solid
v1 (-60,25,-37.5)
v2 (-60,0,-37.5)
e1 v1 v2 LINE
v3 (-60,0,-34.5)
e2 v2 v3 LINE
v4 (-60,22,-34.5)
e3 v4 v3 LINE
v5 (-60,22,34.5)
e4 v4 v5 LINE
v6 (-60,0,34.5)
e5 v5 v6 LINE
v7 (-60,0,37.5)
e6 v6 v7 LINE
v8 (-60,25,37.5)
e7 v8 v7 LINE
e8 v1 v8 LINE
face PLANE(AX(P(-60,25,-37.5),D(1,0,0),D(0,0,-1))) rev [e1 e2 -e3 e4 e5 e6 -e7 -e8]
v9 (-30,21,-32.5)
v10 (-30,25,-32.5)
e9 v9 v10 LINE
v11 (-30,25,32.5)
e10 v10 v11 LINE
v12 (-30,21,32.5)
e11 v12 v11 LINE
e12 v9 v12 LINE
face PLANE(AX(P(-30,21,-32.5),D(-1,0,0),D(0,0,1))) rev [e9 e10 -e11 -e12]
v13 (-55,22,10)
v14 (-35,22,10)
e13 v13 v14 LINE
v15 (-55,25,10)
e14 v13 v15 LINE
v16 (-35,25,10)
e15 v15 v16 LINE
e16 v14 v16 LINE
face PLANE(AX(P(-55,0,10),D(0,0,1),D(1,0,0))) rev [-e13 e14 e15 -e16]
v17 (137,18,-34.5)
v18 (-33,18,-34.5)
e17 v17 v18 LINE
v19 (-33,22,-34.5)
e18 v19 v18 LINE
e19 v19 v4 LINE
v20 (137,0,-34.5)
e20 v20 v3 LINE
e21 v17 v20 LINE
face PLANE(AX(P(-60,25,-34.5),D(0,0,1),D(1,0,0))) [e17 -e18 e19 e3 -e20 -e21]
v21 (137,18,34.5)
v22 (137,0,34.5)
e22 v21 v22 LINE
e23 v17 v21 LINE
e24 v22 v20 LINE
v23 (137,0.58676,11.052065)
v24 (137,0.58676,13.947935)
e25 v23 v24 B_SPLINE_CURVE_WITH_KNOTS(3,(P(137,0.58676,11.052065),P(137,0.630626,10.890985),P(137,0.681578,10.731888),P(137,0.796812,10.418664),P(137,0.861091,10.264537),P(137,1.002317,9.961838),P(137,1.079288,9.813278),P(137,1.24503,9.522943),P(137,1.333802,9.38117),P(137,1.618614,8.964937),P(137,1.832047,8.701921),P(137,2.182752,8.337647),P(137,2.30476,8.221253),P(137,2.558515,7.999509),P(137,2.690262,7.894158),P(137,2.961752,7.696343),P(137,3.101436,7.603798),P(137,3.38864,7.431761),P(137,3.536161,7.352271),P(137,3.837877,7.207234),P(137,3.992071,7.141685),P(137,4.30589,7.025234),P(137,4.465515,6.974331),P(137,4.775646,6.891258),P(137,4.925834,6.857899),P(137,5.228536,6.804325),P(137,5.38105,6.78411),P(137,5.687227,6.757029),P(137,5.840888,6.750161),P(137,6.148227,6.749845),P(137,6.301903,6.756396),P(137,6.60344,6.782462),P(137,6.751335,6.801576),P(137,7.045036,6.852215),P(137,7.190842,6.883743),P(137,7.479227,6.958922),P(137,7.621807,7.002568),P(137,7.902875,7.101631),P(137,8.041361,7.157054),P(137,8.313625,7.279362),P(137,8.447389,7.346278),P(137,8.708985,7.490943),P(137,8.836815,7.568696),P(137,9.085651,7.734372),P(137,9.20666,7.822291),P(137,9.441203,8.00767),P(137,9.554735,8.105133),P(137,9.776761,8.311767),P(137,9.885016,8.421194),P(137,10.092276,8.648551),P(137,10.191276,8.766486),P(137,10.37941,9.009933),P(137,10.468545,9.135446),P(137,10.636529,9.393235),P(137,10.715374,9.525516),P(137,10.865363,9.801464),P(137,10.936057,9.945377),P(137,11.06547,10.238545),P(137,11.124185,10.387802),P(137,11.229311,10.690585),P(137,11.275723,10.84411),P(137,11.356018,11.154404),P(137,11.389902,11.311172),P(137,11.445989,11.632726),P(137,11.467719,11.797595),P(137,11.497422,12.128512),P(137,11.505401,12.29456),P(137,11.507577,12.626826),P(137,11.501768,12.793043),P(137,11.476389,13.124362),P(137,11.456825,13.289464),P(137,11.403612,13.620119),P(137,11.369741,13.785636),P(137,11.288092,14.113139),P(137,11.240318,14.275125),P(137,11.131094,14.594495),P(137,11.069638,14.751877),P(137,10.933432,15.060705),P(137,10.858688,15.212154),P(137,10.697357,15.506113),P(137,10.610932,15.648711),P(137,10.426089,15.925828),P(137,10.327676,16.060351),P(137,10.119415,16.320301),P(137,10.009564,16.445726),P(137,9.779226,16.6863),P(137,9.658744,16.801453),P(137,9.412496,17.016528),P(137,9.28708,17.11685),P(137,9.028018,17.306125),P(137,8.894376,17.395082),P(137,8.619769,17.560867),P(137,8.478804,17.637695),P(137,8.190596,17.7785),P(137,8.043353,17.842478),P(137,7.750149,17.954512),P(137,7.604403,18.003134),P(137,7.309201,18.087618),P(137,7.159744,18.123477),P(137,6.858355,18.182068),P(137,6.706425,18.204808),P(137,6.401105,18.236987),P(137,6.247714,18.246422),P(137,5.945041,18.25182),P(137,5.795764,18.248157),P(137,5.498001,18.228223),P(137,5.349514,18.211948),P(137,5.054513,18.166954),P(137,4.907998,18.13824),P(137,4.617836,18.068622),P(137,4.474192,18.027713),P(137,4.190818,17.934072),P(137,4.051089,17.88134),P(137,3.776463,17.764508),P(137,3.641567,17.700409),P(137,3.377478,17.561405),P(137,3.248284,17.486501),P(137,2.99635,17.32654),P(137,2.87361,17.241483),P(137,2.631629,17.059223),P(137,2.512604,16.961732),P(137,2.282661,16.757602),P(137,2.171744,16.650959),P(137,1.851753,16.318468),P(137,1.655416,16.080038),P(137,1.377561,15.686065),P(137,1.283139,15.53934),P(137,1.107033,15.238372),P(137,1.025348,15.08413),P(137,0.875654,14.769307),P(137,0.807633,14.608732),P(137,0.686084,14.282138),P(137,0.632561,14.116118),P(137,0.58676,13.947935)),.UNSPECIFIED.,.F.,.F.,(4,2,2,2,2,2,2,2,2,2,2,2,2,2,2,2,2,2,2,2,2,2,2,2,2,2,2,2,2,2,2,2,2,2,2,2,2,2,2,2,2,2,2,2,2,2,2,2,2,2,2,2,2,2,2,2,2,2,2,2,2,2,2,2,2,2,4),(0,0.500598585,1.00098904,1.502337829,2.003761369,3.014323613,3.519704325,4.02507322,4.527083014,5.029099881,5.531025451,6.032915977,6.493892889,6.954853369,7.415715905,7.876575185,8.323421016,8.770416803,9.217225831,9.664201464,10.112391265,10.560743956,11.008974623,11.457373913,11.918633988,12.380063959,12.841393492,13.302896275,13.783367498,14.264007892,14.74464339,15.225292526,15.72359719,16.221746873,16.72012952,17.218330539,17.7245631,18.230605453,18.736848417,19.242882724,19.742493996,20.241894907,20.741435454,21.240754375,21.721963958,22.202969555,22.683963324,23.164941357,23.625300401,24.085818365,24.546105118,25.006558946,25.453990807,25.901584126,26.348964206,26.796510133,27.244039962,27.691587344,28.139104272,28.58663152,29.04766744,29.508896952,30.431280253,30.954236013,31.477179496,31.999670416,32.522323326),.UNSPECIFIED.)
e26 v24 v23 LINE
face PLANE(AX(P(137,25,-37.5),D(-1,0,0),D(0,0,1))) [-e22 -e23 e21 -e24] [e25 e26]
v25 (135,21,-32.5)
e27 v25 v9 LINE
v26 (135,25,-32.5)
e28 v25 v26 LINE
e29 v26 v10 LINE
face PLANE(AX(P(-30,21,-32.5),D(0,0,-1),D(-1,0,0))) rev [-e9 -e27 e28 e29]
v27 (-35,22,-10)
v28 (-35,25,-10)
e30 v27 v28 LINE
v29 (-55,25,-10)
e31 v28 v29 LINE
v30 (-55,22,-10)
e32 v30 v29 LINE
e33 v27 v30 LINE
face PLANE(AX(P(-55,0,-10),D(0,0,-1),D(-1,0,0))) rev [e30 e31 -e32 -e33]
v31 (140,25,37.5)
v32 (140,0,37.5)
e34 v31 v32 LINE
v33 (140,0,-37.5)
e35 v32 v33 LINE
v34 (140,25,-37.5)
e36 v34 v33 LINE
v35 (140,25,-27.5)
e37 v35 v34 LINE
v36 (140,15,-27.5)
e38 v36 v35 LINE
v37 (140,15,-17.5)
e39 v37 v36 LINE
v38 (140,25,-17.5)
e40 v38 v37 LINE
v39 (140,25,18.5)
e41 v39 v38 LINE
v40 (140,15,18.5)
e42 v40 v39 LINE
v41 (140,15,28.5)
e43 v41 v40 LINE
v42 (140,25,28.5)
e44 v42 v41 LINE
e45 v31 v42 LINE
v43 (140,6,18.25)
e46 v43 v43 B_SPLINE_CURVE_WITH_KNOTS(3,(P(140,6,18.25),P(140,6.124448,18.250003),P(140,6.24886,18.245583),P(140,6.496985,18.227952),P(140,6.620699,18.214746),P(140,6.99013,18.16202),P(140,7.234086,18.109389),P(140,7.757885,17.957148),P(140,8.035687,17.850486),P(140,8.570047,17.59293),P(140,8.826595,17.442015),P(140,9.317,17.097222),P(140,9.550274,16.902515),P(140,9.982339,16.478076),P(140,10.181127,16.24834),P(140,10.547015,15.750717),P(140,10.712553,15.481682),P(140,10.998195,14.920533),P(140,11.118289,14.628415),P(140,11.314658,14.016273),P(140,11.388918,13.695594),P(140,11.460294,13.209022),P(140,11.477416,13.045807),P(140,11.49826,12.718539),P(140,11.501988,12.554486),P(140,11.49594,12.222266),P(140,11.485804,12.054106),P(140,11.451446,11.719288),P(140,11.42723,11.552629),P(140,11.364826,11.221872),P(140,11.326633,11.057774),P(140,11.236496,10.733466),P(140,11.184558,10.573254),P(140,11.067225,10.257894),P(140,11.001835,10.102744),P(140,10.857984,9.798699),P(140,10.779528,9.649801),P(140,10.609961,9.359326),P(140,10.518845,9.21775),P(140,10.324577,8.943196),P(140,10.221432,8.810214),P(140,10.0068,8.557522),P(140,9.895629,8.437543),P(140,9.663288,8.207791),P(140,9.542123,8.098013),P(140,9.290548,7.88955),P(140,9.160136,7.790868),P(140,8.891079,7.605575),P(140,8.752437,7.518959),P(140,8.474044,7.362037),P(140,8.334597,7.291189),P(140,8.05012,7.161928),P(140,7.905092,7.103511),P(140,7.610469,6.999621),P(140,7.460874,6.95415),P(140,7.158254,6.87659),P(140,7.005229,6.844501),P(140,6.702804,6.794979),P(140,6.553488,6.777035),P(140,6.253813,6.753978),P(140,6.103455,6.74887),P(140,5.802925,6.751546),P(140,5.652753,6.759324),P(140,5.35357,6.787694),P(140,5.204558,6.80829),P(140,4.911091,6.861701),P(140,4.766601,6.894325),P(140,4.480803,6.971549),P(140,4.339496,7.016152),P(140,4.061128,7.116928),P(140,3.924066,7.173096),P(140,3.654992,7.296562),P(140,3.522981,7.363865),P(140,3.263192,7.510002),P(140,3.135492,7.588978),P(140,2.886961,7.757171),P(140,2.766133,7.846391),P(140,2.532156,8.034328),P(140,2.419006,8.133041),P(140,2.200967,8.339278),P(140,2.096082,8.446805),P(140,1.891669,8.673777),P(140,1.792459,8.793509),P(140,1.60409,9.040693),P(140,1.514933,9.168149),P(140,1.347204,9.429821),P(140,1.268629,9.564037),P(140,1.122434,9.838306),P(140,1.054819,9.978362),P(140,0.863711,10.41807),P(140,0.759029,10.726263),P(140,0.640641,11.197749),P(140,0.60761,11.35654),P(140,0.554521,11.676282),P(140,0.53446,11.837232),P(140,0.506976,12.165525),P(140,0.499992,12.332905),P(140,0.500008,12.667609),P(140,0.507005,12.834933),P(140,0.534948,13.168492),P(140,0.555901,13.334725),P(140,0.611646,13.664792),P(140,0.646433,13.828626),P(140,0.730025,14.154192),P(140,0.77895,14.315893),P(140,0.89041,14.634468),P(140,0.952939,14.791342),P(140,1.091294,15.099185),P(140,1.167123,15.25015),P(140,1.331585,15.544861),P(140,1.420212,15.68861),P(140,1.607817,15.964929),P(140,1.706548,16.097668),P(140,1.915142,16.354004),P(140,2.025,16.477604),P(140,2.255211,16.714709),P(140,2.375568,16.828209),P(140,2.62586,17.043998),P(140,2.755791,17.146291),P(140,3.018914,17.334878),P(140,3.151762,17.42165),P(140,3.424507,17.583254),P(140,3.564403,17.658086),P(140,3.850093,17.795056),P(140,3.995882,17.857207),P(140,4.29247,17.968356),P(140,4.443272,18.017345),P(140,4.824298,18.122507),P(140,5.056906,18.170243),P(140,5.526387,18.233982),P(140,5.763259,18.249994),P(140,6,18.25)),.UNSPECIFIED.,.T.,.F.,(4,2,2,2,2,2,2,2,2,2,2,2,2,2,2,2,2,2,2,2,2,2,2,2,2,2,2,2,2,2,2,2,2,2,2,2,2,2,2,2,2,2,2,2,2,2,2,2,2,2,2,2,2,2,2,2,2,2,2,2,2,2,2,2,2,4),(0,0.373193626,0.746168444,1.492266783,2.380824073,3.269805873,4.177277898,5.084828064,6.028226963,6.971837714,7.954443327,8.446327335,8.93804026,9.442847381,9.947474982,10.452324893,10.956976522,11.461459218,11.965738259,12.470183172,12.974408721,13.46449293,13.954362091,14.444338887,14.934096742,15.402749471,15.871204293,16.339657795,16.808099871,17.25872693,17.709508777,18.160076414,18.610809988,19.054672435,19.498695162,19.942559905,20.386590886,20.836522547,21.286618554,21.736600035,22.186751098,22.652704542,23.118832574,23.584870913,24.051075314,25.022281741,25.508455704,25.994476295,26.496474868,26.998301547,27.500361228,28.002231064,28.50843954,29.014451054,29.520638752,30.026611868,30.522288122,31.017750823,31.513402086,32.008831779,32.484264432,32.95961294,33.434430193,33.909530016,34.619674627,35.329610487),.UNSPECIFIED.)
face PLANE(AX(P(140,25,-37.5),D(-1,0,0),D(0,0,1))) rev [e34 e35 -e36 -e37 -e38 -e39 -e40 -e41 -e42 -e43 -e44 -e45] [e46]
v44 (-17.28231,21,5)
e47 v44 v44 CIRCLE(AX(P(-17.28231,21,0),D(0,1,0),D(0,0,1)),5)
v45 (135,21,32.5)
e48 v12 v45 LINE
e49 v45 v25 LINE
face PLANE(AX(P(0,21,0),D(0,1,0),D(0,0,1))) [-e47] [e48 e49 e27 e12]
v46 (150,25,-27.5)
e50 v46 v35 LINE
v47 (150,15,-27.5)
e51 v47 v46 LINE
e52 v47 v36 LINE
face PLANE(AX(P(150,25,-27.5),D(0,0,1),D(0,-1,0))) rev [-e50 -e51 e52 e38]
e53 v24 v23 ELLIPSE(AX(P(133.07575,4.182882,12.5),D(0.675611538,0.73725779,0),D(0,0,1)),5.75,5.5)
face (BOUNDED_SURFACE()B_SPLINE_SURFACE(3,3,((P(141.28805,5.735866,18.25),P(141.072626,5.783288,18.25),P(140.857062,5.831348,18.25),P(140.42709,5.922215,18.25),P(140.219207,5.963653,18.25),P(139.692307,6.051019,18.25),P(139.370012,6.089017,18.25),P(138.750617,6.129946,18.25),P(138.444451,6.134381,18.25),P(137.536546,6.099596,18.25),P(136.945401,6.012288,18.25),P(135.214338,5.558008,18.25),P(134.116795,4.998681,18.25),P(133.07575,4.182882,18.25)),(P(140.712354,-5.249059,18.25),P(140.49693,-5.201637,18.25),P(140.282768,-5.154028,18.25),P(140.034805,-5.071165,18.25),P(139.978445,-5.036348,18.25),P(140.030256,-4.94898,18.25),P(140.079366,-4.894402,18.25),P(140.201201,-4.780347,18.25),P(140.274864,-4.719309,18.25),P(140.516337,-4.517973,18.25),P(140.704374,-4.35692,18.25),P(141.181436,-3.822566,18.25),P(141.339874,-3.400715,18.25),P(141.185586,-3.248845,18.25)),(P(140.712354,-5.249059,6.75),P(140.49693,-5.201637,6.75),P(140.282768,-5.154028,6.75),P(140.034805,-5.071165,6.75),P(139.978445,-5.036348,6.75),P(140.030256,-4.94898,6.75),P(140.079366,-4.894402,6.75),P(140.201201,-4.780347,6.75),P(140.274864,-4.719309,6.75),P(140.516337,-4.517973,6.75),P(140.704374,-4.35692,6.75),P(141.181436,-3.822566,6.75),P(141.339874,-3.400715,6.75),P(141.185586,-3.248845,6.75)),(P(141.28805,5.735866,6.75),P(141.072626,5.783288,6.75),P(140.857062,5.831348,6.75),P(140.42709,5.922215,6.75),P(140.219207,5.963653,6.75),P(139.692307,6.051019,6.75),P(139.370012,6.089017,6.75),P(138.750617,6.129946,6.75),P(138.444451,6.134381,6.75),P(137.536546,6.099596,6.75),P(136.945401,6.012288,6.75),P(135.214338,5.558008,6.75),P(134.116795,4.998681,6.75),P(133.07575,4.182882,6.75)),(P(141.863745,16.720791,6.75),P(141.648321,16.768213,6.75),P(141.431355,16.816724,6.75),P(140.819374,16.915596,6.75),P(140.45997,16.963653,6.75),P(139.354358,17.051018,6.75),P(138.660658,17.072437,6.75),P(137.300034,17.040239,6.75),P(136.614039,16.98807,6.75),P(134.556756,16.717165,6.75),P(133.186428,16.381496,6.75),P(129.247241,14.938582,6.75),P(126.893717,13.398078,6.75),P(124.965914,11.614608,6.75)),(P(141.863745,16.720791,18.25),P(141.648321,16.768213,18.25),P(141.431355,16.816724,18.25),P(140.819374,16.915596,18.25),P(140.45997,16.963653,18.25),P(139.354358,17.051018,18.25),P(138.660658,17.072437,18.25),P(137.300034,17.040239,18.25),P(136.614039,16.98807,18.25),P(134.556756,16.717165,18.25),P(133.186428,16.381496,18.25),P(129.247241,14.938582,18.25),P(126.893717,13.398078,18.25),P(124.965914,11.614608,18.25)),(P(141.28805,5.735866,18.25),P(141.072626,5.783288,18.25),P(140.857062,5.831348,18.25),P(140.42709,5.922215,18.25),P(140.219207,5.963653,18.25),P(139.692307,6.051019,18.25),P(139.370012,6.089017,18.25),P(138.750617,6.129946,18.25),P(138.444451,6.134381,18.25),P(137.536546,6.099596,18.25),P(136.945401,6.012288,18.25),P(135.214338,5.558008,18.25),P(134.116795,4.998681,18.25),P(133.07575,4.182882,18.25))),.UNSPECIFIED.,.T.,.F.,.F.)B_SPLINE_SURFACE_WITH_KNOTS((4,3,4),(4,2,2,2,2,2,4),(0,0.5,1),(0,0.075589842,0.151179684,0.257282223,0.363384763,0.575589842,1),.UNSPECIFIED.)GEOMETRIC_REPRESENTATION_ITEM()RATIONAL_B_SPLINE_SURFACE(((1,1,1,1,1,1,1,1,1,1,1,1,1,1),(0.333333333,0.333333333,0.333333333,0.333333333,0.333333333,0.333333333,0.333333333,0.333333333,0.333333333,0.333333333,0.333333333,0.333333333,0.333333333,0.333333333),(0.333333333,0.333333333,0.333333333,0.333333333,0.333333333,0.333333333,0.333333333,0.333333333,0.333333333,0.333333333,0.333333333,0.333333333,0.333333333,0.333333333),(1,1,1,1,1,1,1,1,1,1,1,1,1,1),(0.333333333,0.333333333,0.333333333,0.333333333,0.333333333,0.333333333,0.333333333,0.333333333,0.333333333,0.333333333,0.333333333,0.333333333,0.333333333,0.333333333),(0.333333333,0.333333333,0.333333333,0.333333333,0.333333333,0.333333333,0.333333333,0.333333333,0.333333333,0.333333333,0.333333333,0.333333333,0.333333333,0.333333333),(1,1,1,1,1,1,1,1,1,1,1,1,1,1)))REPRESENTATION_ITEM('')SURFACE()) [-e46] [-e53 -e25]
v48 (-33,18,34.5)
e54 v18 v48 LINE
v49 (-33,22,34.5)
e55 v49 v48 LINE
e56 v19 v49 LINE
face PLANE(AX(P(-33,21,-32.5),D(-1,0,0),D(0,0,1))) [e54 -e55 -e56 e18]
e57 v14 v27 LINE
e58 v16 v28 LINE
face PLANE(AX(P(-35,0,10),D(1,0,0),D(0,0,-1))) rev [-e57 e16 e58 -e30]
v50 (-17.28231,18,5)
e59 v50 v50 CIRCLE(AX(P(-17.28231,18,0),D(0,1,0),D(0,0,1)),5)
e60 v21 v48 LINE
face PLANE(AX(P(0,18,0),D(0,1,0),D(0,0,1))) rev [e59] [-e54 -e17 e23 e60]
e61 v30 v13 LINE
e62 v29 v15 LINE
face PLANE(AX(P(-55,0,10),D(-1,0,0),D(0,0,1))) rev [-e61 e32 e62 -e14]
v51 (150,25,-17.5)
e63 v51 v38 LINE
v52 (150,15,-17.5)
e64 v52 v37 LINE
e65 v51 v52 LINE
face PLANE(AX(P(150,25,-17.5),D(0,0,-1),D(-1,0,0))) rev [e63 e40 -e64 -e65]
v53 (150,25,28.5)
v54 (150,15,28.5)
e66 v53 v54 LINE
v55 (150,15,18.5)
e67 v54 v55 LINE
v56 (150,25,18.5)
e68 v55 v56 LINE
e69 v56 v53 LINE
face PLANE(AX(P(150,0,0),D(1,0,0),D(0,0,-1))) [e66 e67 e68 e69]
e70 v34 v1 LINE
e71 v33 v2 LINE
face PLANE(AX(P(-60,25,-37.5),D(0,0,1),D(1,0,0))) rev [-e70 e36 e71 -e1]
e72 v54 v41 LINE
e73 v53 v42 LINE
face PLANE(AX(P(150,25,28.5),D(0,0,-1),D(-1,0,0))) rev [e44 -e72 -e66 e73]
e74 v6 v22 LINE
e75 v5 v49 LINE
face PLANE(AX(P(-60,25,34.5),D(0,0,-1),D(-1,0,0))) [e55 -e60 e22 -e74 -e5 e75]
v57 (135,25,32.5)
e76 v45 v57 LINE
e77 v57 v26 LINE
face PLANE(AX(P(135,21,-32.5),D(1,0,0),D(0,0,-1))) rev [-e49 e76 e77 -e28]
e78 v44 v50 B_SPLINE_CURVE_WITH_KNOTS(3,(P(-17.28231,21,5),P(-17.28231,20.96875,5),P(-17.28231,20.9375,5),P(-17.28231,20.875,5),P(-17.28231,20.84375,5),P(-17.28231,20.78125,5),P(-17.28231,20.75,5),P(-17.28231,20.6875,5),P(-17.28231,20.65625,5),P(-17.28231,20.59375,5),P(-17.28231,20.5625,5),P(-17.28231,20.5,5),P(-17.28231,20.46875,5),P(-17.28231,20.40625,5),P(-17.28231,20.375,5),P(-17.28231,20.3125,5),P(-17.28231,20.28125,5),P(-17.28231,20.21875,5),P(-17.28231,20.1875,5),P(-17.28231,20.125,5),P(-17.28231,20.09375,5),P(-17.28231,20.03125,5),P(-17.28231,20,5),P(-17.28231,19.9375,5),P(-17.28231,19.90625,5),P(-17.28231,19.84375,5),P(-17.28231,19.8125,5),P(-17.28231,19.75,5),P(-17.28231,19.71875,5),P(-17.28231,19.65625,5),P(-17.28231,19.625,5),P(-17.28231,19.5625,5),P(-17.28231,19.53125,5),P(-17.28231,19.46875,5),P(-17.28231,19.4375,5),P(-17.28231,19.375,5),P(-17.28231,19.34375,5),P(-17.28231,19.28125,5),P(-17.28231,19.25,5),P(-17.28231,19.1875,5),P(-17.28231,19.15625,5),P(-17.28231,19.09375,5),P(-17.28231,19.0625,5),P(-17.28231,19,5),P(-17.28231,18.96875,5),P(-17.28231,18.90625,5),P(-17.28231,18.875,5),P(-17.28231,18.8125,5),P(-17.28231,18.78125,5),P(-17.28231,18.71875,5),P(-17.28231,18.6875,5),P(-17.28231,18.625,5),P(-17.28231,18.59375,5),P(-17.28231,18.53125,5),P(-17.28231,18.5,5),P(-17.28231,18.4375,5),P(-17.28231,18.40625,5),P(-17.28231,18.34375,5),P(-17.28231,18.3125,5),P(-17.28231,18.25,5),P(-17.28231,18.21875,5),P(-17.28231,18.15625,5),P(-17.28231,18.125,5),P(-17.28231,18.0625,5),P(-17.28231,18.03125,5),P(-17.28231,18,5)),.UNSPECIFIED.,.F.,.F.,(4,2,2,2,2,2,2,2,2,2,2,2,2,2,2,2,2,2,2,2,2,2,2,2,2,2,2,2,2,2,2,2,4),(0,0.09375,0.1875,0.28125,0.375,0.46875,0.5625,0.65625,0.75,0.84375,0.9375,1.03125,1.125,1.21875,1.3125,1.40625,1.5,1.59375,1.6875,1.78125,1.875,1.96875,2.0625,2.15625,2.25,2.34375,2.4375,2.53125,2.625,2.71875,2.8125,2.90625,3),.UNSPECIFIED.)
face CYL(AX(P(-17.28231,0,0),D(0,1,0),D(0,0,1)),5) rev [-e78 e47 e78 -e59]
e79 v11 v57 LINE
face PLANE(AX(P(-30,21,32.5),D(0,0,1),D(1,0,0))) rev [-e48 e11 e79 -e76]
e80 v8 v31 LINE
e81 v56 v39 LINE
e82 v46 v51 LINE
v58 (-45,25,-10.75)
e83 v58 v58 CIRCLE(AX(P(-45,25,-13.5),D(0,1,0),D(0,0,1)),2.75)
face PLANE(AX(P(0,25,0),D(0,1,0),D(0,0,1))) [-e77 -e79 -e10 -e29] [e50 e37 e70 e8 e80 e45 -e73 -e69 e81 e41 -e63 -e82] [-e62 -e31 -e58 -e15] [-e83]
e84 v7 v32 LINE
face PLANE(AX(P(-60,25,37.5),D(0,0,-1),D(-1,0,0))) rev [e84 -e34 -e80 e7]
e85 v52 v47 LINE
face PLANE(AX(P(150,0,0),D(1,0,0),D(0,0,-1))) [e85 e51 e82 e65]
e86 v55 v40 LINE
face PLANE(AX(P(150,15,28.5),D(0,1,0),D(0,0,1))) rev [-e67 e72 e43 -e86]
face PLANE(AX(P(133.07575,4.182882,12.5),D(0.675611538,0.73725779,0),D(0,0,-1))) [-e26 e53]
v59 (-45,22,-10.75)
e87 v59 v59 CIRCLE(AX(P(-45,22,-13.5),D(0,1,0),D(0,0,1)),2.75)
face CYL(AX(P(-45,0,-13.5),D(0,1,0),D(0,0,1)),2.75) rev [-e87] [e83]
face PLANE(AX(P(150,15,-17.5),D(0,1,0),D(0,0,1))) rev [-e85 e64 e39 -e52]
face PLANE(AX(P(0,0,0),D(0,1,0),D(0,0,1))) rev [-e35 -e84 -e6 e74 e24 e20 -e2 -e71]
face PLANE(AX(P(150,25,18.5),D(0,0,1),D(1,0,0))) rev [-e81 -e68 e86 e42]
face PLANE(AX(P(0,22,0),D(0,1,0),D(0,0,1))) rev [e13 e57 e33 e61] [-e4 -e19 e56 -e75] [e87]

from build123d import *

# Parameters (mm, degrees)
SKETCH1_W           = 200
SKETCH1_H           = 75
BOSS_EXTRUDE1_DEPTH = 25
SKETCH9_W           = 165
SKETCH9_H           = 65
CUT_EXTRUDE5_DEPTH  = 4
SHELL3_START        = -34.5
SHELL3_DEPTH        = 69
SKETCH14_W          = 10
SKETCH14_H          = 10
BOSS_EXTRUDE5_DEPTH = 10
SKETCH15_R          = 5
CUT_EXTRUDE7_DEPTH  = 157.036053526
SKETCH16_W          = 20
SKETCH16_H          = 20
CUT_EXTRUDE8_DEPTH  = 157.624551077
SKETCH19_RX         = 5.75
SKETCH19_RY         = 5.5
SKETCH21_R          = 2.75
CUT_EXTRUDE9_DEPTH  = 157.624551117


# Read off the part's stored shape, not the designer's step: Shell3
with BuildPart() as part:
    # Sketch1 → Boss-Extrude1 (new body)
    with BuildSketch(Plane(origin=(0, 0, 0), x_dir=(1, 0, 0), z_dir=(0, 1, 0))):
        with Locations((40, 0)):
            Rectangle(SKETCH1_W, SKETCH1_H)
    extrude(amount=BOSS_EXTRUDE1_DEPTH)

    # Sketch9 → Cut-Extrude5 (cut)
    with BuildSketch(Plane(origin=(0, 25, 0), x_dir=(1, 0, 0), z_dir=(0, 1, 0))):
        with Locations((52.5, 0)):
            Rectangle(SKETCH9_W, SKETCH9_H)
    extrude(amount=-CUT_EXTRUDE5_DEPTH, mode=Mode.SUBTRACT)

    # Shell3 outline → Shell3 (cut)
    with BuildSketch(Plane.XY.offset(SHELL3_START)):
        Polygon((137, 0), (137, 18), (-33, 18), (-33, 22), (-60, 22), (-60, 0), align=None)
    extrude(amount=SHELL3_DEPTH, mode=Mode.SUBTRACT)

    # Sketch14 → Boss-Extrude5 (add)
    with BuildSketch(Plane(origin=(140, 0, 0), x_dir=(0, 0, -1), z_dir=(1, 0, 0))):
        with Locations((-23.5, 20)):
            Rectangle(SKETCH14_W, SKETCH14_H)
        with Locations((22.5, 20)):
            Rectangle(SKETCH14_W, SKETCH14_H)
    extrude(amount=BOSS_EXTRUDE5_DEPTH)

    # Sketch15 → Cut-Extrude7 (cut, through all)
    with BuildSketch(Plane(origin=(0, 21, 0), x_dir=(1, 0, 0), z_dir=(0, 1, 0))):
        with Locations(Location((-17.28231035, 0, 0), (0, 0, 270))):
            Circle(SKETCH15_R)
    extrude(amount=-CUT_EXTRUDE7_DEPTH, mode=Mode.SUBTRACT)

    # Sketch16 → Cut-Extrude8 (cut, through all)
    with BuildSketch(Plane(origin=(0, 25, 0), x_dir=(1, 0, 0), z_dir=(0, 1, 0))):
        with Locations((-45, 0)):
            Rectangle(SKETCH16_W, SKETCH16_H)
    extrude(amount=-CUT_EXTRUDE8_DEPTH, mode=Mode.SUBTRACT)

    # Cut-Sweep2: sweep along a path in Sketch20
    with BuildLine() as cut_sweep2_path:  # in the path sketch's own coordinates; laid on its plane below (add() does not lay a ready-made edge on the line's plane)
        add(Edge.make_bspline(
            [(-140, 6), (-136.19888528, 6.630281352), (-133.075750061, 4.182881523)],
            knots=[0, 0, 0, 1, 1, 1], degree=2))
    # Sketch19 → Cut-Sweep2 (sweep, cut)
    with BuildSketch(Plane(origin=(140, 0, 0), x_dir=(0, 0, -1), z_dir=(1, 0, 0))):
        with Locations(Location((-12.5, 6), (0, 0, 0))):
            Ellipse(SKETCH19_RX, SKETCH19_RY)
    sweep(path=Plane(origin=(0, 0, 0), x_dir=(-1, 0, 0), z_dir=(0, 0, -1)) * cut_sweep2_path.line, mode=Mode.SUBTRACT)

    # Sketch21 → Cut-Extrude9 (cut, through all)
    with BuildSketch(Plane(origin=(0, 25, 0), x_dir=(1, 0, 0), z_dir=(0, 1, 0))):
        with Locations(Location((-45, 13.5, 0), (0, 0, 270))):
            Circle(SKETCH21_R)
    extrude(amount=-CUT_EXTRUDE9_DEPTH, mode=Mode.SUBTRACT)


solid = part.part
